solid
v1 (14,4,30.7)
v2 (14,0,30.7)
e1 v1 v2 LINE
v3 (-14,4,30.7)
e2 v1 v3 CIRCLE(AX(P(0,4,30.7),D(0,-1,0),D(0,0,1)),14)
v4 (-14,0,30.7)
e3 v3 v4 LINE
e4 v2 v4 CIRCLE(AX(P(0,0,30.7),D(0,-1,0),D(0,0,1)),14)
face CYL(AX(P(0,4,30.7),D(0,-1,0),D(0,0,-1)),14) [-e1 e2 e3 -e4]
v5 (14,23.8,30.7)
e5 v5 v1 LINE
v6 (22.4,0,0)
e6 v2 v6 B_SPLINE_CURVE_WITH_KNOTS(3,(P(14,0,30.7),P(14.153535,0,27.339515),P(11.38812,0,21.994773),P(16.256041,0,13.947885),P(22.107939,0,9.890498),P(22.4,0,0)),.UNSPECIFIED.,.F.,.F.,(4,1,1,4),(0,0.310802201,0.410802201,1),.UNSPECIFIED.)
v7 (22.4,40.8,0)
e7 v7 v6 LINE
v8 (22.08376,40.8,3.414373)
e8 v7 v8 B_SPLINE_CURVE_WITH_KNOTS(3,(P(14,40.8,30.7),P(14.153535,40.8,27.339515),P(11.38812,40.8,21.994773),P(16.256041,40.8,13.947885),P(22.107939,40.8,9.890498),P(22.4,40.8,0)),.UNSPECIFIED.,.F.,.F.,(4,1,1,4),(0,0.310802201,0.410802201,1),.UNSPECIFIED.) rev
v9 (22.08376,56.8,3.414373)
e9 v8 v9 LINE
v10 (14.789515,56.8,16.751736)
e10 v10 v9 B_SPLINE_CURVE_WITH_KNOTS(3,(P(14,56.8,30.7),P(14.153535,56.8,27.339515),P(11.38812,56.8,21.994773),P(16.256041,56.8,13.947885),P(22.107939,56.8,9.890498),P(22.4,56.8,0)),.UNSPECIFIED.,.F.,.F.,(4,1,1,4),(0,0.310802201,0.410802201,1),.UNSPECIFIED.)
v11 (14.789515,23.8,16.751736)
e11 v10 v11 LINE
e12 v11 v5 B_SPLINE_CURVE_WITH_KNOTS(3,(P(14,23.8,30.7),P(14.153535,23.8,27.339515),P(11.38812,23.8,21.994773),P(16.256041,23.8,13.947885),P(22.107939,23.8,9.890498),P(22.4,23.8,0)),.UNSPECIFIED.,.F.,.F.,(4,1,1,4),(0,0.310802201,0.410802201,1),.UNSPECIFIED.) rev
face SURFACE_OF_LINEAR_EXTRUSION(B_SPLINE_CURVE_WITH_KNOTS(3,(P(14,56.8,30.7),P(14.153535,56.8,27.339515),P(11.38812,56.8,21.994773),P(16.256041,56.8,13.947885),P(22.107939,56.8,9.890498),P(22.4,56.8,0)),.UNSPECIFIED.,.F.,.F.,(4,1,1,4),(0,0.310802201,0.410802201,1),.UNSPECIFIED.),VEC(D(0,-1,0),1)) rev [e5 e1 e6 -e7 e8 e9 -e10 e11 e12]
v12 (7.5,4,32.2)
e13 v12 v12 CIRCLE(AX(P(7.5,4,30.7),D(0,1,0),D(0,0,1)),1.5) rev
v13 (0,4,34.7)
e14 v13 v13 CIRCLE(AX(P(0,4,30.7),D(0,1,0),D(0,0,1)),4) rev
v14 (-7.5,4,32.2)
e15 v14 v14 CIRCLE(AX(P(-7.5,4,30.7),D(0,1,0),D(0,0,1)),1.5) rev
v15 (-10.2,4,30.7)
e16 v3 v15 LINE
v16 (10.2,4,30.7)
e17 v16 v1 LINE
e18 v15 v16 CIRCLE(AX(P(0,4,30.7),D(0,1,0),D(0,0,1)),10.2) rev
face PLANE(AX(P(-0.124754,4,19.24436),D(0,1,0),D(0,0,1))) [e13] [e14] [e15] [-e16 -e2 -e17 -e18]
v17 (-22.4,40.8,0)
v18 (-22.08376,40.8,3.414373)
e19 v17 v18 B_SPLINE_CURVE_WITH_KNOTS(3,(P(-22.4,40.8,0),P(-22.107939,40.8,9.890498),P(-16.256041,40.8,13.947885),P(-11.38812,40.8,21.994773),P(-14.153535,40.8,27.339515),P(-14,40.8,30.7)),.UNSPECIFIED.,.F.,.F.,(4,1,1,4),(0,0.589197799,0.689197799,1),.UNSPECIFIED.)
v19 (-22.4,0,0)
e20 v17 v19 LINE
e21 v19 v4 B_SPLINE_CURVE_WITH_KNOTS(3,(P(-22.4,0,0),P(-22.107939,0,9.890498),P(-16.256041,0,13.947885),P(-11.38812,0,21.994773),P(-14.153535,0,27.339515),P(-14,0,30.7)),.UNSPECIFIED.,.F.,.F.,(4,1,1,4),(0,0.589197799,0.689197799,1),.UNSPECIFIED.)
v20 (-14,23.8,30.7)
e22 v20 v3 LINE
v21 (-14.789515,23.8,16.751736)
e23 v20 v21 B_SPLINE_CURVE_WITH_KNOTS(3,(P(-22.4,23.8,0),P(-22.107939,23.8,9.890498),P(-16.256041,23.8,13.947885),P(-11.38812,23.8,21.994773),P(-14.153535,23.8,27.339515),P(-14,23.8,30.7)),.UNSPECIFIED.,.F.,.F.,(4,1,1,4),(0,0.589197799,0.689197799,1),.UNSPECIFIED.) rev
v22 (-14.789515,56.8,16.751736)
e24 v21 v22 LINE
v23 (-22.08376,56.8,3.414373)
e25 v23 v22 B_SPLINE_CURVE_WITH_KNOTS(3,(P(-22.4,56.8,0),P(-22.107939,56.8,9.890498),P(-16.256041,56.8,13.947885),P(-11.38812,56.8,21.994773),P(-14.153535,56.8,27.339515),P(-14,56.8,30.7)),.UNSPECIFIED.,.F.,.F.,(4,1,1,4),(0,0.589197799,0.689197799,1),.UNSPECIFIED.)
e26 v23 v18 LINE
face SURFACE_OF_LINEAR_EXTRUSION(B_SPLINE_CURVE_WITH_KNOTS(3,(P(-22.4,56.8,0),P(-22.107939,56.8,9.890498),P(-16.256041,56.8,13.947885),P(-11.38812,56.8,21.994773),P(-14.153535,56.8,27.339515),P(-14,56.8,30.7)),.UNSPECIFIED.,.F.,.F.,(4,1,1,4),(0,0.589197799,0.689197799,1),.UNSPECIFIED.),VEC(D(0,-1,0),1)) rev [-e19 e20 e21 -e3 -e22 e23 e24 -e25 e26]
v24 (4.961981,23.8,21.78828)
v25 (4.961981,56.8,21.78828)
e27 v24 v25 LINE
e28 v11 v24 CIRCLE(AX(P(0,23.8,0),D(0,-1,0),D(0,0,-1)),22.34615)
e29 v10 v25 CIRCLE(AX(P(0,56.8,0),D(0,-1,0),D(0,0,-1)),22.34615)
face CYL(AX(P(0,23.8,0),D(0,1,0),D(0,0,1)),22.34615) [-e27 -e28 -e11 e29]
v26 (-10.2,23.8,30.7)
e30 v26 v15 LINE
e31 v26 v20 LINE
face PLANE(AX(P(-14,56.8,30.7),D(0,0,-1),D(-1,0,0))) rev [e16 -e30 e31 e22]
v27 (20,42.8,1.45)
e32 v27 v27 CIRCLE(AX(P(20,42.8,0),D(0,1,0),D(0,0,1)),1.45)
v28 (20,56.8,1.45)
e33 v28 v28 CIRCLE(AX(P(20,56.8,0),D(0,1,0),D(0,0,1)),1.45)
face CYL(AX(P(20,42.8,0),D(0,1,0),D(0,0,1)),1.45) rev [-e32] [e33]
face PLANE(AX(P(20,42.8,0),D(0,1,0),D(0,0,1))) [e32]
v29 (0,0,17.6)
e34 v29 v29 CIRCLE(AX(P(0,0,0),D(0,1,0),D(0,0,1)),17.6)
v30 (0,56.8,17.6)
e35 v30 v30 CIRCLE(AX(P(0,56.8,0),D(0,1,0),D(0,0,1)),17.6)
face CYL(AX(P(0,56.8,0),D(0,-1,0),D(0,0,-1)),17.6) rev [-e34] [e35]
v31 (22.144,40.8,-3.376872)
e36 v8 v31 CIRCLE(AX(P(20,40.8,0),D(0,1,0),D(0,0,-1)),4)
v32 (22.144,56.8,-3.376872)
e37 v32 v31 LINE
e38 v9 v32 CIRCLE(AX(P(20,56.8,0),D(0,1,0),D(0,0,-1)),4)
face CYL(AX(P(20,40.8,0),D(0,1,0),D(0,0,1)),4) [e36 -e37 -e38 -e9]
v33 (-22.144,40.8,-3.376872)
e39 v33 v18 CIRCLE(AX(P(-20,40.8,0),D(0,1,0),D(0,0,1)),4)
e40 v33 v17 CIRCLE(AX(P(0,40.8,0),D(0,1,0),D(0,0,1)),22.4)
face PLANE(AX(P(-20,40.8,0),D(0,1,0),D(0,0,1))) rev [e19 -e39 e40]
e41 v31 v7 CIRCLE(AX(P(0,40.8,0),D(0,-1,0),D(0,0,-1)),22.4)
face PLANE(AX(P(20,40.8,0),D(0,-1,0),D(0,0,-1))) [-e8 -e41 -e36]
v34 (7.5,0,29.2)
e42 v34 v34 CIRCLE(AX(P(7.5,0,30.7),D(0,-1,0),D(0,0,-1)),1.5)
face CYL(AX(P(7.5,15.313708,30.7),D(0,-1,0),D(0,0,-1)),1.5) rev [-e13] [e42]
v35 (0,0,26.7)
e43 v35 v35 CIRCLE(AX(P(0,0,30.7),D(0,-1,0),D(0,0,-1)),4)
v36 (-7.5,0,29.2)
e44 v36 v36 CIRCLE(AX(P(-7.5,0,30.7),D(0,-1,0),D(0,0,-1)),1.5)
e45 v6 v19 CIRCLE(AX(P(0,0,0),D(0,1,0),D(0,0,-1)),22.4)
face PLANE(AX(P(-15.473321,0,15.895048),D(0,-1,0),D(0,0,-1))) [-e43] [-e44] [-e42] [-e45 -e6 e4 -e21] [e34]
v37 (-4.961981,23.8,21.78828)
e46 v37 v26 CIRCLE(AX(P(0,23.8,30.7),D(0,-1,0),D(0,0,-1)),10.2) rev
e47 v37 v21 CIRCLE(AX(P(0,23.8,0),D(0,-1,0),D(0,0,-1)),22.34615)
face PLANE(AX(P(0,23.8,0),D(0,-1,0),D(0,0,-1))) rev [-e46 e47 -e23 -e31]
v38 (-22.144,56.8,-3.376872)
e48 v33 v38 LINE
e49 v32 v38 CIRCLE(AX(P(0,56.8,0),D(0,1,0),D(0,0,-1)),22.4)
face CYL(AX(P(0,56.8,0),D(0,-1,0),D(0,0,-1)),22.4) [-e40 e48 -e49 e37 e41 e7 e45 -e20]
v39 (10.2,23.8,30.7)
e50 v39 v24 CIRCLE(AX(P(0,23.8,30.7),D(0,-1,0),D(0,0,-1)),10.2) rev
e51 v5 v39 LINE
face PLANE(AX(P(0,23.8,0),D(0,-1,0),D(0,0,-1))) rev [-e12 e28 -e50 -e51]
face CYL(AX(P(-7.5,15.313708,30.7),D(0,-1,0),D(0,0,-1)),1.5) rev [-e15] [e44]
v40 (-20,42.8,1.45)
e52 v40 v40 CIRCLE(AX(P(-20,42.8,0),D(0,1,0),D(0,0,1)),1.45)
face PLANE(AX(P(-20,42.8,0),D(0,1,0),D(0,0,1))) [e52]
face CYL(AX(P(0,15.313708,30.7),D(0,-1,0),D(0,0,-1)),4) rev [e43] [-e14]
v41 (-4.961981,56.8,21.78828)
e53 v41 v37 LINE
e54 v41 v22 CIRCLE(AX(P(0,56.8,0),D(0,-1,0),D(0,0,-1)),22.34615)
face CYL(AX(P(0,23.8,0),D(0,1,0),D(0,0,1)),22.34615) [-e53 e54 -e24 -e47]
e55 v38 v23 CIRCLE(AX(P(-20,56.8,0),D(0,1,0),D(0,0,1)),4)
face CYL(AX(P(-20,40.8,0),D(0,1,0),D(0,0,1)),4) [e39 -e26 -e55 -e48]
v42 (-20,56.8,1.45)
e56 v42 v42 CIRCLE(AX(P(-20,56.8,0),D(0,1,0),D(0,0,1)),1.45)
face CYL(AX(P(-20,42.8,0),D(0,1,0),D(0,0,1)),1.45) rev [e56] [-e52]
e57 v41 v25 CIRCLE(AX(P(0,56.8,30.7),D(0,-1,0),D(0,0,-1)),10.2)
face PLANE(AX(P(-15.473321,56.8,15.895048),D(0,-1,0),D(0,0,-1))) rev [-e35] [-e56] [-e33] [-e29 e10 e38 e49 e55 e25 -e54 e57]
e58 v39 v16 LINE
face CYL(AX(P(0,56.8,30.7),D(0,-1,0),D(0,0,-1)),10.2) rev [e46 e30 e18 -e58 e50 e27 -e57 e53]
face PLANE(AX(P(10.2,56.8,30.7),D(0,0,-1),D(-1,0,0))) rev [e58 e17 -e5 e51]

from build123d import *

# Parameters (mm, degrees)
SKETCH1_R              = 17.6
BOSS_EXTRUDE1_DEPTH    = 56.8
BOSS_EXTRUDE2_DEPTH    = 4
SKETCH4_R              = 4
SKETCH4_R_2            = 1.5
CUT_EXTRUDE1_DEPTH     = 4
BOSS_EXTRUDE3_DEPTH    = 16
CUT_EXTRUDE2_START     = -14
CUT_EXTRUDE2_OUTLINE_R = 1.45
CUT_EXTRUDE2_DEPTH     = 14
CUT_EXTRUDE3_DEPTH     = 33


# Read off the part's stored shape, not the designer's step: Cut-Extrude2
with BuildPart() as part:
    # Sketch1 → Boss-Extrude1 (new body)
    with BuildSketch(Plane(origin=(0, 0, 0), x_dir=(1, 0, 0), z_dir=(0, 1, 0))):
        with BuildLine():
            Line((-14, -30.7), (-10.2, -30.7))
            ThreePointArc((-10.2, -30.7), (0, -20.5), (10.2, -30.7))
            Line((10.2, -30.7), (14, -30.7))
            add(Edge.make_bspline(
                [(22.4, 0), (22.107939007, -9.890498416), (16.256040946, -13.947885017), (11.388120446, -21.994772931), (14.153535086, -27.339514928), (14, -30.7)],
                knots=[0, 0, 0, 0, 0.589197799, 0.689197799, 1, 1, 1, 1], degree=3))
            ThreePointArc((22.4, 0), (0, 22.4), (-22.4, 0))
            add(Edge.make_bspline(
                [(-22.4, 0), (-22.107939007, -9.890498416), (-16.256040946, -13.947885017), (-11.388120446, -21.994772931), (-14.153535086, -27.339514928), (-14, -30.7)],
                knots=[0, 0, 0, 0, 0.589197799, 0.689197799, 1, 1, 1, 1], degree=3))
        make_face()
        with Locations(Location((0, 0, 0), (0, 0, 270))):
            Circle(SKETCH1_R, mode=Mode.SUBTRACT)
    extrude(amount=BOSS_EXTRUDE1_DEPTH)

    # Sketch3 → Boss-Extrude2 (add)
    with BuildSketch(Plane.XZ):
        with BuildLine():
            ThreePointArc((-14, 30.7), (0, 44.7), (14, 30.7))
            add(Edge.make_bspline(
                [(-14, 30.7), (-12.62265513, 25.007813603), (0.167580012, 13.239499872), (11.954859233, 25.492817672), (14, 30.7)],
                knots=[0, 0, 0, 0, 0.503384006, 1, 1, 1, 1], degree=3))
        make_face()
    extrude(amount=-BOSS_EXTRUDE2_DEPTH)

    # Sketch4 → Cut-Extrude1 (cut)
    with BuildSketch(Plane.XZ):
        with Locations(Location((0, 30.7, 0), (0, 0, 270))):
            Circle(SKETCH4_R)
        with Locations(Location((-7.5, 30.7, 0), (0, 0, 270))):
            Circle(SKETCH4_R_2)
        with Locations(Location((7.5, 30.7, 0), (0, 0, 270))):
            Circle(SKETCH4_R_2)
    extrude(amount=-CUT_EXTRUDE1_DEPTH, mode=Mode.SUBTRACT)

    # Sketch5 → Boss-Extrude3 (add)
    with BuildSketch(Plane(origin=(0, 56.8, 0), x_dir=(1, 0, 0), z_dir=(0, 1, 0))):
        with BuildLine():
            Line((20, 4), (20, -4))
            ThreePointArc((20, -4), (24, 0), (20, 4))
        make_face()
        with BuildLine():
            Line((-20, 4), (-20, -4))
            ThreePointArc((-20, -4), (-24, 0), (-20, 4))
        make_face()
    extrude(amount=-BOSS_EXTRUDE3_DEPTH)

    # Cut-Extrude2 outline → Cut-Extrude2 (cut)
    with BuildSketch(Plane(origin=(0, 56.8, 0), x_dir=(1, 0, 0), z_dir=(0, 1, 0)).offset(CUT_EXTRUDE2_START)):
        with Locations((20, 0)):
            Circle(CUT_EXTRUDE2_OUTLINE_R)
        with Locations((-20, 0)):
            Circle(CUT_EXTRUDE2_OUTLINE_R)
    extrude(amount=CUT_EXTRUDE2_DEPTH, mode=Mode.SUBTRACT)

    # Sketch7 → Cut-Extrude3 (cut)
    with BuildSketch(Plane(origin=(0, 56.8, 0), x_dir=(1, 0, 0), z_dir=(0, 1, 0))):
        with BuildLine():
            Line((-22.083760266, -3.414373025), (-36.083760266, -3.414373025))
            ThreePointArc((-36.083760266, -3.414373025), (0, -36.244940311), (36.083760266, -3.414373025))
            Line((36.083760266, -3.414373025), (22.083760266, -3.414373025))
            ThreePointArc((22.083760266, -3.414373025), (0, -22.346149795), (-22.083760266, -3.414373025))
        make_face()
    extrude(amount=-CUT_EXTRUDE3_DEPTH, mode=Mode.SUBTRACT)


solid = part.part
